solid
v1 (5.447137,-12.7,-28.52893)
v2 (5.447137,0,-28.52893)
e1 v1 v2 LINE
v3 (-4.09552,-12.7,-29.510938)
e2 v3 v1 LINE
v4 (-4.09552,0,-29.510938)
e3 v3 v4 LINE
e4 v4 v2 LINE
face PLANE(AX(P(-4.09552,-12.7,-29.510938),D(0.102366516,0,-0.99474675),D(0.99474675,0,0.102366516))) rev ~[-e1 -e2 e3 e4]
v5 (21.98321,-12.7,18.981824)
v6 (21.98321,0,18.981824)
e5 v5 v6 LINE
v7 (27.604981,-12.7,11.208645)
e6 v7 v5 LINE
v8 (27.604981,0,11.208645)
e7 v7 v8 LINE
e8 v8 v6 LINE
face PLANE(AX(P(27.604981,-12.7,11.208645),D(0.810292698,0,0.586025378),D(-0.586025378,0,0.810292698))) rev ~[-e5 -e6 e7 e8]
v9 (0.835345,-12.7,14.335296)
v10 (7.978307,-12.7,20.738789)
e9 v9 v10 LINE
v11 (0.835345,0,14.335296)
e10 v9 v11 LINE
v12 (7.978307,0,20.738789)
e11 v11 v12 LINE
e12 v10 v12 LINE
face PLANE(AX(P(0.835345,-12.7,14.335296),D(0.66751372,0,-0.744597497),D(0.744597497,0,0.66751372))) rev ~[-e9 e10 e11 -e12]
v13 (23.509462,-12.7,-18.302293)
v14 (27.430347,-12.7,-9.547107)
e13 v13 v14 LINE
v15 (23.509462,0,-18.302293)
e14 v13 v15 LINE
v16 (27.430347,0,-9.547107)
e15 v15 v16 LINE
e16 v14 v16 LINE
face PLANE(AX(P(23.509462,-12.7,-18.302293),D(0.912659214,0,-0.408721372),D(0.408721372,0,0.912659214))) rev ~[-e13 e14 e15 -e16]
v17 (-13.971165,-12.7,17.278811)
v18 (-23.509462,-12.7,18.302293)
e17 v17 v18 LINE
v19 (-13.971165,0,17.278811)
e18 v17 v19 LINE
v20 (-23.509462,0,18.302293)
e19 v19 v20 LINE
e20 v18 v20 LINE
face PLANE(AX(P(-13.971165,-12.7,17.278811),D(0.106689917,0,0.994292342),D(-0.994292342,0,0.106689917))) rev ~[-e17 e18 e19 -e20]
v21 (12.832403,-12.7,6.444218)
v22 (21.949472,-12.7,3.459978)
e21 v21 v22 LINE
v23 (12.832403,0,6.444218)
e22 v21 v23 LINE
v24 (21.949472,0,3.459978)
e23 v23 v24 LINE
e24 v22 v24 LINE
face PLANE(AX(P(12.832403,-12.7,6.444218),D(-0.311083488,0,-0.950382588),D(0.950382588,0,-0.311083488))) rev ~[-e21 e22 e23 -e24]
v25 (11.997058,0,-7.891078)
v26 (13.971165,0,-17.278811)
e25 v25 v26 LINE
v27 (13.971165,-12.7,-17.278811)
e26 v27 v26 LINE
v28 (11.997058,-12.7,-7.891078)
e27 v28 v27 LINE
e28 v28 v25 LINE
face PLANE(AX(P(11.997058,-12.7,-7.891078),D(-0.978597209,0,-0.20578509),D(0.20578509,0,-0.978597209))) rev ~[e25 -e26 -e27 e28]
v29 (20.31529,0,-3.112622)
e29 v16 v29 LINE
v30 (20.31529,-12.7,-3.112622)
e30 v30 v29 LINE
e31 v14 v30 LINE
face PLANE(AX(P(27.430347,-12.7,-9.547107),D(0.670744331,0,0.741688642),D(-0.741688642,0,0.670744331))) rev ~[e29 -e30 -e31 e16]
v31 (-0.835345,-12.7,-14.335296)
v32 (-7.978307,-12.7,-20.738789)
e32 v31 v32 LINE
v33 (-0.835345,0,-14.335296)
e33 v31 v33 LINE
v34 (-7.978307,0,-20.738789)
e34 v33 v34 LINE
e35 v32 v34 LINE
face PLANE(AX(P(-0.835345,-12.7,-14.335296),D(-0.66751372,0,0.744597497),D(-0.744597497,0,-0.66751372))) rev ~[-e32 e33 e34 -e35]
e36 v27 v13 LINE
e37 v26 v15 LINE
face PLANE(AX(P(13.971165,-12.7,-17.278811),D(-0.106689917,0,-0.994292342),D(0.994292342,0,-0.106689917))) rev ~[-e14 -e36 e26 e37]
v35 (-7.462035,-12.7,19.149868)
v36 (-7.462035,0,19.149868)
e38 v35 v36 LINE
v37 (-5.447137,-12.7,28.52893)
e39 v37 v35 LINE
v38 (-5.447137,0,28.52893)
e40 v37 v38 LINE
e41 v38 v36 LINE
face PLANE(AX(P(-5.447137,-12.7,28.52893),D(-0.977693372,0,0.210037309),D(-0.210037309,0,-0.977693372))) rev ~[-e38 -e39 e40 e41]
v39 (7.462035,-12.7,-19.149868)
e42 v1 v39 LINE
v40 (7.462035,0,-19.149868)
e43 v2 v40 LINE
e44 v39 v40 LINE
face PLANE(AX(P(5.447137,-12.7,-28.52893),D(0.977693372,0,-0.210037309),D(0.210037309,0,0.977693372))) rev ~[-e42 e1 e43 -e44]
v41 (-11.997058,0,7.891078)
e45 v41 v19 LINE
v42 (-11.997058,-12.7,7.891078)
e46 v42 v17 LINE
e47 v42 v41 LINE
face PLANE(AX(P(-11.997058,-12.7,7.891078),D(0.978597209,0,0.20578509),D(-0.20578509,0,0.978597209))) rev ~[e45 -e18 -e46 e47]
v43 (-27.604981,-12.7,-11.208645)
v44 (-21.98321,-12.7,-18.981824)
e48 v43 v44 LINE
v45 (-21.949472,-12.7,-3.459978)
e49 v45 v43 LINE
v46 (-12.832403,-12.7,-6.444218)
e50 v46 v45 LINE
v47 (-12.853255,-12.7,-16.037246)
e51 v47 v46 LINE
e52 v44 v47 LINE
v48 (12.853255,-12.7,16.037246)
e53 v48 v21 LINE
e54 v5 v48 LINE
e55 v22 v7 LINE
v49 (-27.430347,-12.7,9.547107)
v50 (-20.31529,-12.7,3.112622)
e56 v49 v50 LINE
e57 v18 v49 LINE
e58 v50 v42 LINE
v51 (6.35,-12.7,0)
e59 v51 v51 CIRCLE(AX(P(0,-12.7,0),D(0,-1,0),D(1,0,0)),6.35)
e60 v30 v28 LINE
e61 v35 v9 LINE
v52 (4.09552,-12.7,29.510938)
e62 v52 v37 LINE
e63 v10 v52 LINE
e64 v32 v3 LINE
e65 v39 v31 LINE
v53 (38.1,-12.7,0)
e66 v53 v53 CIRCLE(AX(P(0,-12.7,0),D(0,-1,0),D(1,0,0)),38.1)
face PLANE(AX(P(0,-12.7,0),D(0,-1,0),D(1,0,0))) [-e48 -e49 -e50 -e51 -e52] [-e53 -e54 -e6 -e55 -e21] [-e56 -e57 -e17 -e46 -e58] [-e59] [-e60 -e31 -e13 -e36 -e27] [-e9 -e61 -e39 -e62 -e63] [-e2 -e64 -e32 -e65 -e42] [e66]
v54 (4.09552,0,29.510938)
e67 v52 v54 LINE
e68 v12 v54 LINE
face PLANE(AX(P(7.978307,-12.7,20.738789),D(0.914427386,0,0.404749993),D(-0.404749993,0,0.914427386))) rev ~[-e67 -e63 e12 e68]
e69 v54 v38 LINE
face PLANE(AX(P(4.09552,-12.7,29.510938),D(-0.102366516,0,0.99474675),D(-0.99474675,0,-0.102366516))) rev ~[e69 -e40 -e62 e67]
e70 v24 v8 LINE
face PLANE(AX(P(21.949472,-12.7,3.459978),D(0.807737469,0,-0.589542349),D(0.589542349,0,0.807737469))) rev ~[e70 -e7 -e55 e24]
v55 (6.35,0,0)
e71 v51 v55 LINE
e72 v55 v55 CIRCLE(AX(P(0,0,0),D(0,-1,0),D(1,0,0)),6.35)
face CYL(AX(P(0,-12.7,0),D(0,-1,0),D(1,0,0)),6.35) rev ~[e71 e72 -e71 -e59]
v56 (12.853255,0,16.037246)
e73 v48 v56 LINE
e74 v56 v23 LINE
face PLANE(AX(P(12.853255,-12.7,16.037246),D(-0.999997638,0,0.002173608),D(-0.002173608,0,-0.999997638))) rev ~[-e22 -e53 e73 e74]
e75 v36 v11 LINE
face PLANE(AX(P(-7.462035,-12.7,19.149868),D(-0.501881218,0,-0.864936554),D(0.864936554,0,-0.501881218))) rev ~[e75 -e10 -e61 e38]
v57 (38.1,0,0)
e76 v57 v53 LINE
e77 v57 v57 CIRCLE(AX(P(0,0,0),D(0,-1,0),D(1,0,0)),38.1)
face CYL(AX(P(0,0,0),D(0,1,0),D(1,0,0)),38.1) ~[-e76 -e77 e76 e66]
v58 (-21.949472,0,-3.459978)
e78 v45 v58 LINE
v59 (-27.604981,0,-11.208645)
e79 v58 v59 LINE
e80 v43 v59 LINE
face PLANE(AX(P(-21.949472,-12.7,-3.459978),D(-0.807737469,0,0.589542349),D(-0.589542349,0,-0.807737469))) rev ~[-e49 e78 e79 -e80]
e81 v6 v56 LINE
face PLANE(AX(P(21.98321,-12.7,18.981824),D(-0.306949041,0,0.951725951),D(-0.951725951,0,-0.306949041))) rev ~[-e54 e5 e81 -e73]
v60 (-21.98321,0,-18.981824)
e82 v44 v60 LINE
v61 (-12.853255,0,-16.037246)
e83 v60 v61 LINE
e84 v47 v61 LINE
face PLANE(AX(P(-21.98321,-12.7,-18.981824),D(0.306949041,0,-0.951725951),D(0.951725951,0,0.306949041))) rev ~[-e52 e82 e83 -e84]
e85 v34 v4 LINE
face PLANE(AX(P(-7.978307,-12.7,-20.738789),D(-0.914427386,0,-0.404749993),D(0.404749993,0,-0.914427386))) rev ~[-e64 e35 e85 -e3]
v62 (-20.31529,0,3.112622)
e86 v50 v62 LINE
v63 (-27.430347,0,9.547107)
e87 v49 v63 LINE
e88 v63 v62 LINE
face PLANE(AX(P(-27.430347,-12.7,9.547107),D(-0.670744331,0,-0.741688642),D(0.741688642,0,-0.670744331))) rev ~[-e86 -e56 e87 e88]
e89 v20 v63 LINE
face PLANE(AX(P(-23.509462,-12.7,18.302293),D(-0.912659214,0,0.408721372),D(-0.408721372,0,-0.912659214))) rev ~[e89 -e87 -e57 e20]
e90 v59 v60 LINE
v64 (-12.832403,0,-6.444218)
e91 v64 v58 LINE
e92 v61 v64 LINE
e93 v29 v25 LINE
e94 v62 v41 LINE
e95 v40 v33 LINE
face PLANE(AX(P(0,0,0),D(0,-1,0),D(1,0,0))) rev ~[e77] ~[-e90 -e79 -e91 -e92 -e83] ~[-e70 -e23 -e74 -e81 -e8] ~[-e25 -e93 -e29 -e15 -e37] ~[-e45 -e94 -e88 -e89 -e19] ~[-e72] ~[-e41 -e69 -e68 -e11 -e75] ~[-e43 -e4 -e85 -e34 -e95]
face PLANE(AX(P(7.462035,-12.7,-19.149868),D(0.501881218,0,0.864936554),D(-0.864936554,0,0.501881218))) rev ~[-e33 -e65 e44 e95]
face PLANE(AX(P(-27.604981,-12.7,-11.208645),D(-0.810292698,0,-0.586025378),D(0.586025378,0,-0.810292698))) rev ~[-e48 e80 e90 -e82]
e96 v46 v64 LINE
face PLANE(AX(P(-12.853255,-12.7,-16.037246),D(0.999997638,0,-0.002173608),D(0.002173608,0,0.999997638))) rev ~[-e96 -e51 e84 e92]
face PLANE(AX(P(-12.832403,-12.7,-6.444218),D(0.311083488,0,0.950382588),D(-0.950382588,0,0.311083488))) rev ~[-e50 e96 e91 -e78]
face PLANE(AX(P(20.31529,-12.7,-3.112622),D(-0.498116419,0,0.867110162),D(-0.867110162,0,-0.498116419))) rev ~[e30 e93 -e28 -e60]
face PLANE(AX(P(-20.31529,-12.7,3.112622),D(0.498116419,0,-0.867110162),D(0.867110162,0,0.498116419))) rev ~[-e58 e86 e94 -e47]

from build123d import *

# Parameters (mm, degrees)
F0_R            = 38.1
F1_DEPTH        = 12.7
F2_R            = 6.35
F3_DEPTH        = 12.701
F5_DEPTH        = 12.701
F5_COPIES_COUNT = 6


# Not quite as in the source:
# - a pattern or mirror of a feature is missing from the dataset's text; its kind, count and spacing are read off the source's solid


with BuildPart() as f1:
    # F0 (on Front) → F1 (new body)
    with BuildSketch(Plane.XZ):
        Circle(F0_R)
    extrude(amount=F1_DEPTH)

    # F2 (on face) → F3 (cut, through all)
    with BuildSketch(Plane.XZ.offset(12.7)):
        Circle(F2_R)
    extrude(amount=-F3_DEPTH, mode=Mode.SUBTRACT)

    # F4 (on face) → F5 (cut, through all)
    with BuildSketch(Plane.XZ.offset(12.7)):
        Polygon((0.8353452235, 14.3352959198), (7.9783069864, 20.7387890774), (4.0955196667, 29.5109376166), (-5.4471366308, 28.5289304107), (-7.4620352459, 19.149868041), align=None)
    f5 = extrude(amount=-F5_DEPTH, mode=Mode.SUBTRACT)

    # F5_copies: F5 ×6 about axis
    f5_copies_axis = Axis((0, 0, 0), (0, 1, 0))
    for i in range(1, F5_COPIES_COUNT):
        add(f5.rotate(f5_copies_axis, i * 360 / F5_COPIES_COUNT), mode=Mode.SUBTRACT)


solid = f1.part
